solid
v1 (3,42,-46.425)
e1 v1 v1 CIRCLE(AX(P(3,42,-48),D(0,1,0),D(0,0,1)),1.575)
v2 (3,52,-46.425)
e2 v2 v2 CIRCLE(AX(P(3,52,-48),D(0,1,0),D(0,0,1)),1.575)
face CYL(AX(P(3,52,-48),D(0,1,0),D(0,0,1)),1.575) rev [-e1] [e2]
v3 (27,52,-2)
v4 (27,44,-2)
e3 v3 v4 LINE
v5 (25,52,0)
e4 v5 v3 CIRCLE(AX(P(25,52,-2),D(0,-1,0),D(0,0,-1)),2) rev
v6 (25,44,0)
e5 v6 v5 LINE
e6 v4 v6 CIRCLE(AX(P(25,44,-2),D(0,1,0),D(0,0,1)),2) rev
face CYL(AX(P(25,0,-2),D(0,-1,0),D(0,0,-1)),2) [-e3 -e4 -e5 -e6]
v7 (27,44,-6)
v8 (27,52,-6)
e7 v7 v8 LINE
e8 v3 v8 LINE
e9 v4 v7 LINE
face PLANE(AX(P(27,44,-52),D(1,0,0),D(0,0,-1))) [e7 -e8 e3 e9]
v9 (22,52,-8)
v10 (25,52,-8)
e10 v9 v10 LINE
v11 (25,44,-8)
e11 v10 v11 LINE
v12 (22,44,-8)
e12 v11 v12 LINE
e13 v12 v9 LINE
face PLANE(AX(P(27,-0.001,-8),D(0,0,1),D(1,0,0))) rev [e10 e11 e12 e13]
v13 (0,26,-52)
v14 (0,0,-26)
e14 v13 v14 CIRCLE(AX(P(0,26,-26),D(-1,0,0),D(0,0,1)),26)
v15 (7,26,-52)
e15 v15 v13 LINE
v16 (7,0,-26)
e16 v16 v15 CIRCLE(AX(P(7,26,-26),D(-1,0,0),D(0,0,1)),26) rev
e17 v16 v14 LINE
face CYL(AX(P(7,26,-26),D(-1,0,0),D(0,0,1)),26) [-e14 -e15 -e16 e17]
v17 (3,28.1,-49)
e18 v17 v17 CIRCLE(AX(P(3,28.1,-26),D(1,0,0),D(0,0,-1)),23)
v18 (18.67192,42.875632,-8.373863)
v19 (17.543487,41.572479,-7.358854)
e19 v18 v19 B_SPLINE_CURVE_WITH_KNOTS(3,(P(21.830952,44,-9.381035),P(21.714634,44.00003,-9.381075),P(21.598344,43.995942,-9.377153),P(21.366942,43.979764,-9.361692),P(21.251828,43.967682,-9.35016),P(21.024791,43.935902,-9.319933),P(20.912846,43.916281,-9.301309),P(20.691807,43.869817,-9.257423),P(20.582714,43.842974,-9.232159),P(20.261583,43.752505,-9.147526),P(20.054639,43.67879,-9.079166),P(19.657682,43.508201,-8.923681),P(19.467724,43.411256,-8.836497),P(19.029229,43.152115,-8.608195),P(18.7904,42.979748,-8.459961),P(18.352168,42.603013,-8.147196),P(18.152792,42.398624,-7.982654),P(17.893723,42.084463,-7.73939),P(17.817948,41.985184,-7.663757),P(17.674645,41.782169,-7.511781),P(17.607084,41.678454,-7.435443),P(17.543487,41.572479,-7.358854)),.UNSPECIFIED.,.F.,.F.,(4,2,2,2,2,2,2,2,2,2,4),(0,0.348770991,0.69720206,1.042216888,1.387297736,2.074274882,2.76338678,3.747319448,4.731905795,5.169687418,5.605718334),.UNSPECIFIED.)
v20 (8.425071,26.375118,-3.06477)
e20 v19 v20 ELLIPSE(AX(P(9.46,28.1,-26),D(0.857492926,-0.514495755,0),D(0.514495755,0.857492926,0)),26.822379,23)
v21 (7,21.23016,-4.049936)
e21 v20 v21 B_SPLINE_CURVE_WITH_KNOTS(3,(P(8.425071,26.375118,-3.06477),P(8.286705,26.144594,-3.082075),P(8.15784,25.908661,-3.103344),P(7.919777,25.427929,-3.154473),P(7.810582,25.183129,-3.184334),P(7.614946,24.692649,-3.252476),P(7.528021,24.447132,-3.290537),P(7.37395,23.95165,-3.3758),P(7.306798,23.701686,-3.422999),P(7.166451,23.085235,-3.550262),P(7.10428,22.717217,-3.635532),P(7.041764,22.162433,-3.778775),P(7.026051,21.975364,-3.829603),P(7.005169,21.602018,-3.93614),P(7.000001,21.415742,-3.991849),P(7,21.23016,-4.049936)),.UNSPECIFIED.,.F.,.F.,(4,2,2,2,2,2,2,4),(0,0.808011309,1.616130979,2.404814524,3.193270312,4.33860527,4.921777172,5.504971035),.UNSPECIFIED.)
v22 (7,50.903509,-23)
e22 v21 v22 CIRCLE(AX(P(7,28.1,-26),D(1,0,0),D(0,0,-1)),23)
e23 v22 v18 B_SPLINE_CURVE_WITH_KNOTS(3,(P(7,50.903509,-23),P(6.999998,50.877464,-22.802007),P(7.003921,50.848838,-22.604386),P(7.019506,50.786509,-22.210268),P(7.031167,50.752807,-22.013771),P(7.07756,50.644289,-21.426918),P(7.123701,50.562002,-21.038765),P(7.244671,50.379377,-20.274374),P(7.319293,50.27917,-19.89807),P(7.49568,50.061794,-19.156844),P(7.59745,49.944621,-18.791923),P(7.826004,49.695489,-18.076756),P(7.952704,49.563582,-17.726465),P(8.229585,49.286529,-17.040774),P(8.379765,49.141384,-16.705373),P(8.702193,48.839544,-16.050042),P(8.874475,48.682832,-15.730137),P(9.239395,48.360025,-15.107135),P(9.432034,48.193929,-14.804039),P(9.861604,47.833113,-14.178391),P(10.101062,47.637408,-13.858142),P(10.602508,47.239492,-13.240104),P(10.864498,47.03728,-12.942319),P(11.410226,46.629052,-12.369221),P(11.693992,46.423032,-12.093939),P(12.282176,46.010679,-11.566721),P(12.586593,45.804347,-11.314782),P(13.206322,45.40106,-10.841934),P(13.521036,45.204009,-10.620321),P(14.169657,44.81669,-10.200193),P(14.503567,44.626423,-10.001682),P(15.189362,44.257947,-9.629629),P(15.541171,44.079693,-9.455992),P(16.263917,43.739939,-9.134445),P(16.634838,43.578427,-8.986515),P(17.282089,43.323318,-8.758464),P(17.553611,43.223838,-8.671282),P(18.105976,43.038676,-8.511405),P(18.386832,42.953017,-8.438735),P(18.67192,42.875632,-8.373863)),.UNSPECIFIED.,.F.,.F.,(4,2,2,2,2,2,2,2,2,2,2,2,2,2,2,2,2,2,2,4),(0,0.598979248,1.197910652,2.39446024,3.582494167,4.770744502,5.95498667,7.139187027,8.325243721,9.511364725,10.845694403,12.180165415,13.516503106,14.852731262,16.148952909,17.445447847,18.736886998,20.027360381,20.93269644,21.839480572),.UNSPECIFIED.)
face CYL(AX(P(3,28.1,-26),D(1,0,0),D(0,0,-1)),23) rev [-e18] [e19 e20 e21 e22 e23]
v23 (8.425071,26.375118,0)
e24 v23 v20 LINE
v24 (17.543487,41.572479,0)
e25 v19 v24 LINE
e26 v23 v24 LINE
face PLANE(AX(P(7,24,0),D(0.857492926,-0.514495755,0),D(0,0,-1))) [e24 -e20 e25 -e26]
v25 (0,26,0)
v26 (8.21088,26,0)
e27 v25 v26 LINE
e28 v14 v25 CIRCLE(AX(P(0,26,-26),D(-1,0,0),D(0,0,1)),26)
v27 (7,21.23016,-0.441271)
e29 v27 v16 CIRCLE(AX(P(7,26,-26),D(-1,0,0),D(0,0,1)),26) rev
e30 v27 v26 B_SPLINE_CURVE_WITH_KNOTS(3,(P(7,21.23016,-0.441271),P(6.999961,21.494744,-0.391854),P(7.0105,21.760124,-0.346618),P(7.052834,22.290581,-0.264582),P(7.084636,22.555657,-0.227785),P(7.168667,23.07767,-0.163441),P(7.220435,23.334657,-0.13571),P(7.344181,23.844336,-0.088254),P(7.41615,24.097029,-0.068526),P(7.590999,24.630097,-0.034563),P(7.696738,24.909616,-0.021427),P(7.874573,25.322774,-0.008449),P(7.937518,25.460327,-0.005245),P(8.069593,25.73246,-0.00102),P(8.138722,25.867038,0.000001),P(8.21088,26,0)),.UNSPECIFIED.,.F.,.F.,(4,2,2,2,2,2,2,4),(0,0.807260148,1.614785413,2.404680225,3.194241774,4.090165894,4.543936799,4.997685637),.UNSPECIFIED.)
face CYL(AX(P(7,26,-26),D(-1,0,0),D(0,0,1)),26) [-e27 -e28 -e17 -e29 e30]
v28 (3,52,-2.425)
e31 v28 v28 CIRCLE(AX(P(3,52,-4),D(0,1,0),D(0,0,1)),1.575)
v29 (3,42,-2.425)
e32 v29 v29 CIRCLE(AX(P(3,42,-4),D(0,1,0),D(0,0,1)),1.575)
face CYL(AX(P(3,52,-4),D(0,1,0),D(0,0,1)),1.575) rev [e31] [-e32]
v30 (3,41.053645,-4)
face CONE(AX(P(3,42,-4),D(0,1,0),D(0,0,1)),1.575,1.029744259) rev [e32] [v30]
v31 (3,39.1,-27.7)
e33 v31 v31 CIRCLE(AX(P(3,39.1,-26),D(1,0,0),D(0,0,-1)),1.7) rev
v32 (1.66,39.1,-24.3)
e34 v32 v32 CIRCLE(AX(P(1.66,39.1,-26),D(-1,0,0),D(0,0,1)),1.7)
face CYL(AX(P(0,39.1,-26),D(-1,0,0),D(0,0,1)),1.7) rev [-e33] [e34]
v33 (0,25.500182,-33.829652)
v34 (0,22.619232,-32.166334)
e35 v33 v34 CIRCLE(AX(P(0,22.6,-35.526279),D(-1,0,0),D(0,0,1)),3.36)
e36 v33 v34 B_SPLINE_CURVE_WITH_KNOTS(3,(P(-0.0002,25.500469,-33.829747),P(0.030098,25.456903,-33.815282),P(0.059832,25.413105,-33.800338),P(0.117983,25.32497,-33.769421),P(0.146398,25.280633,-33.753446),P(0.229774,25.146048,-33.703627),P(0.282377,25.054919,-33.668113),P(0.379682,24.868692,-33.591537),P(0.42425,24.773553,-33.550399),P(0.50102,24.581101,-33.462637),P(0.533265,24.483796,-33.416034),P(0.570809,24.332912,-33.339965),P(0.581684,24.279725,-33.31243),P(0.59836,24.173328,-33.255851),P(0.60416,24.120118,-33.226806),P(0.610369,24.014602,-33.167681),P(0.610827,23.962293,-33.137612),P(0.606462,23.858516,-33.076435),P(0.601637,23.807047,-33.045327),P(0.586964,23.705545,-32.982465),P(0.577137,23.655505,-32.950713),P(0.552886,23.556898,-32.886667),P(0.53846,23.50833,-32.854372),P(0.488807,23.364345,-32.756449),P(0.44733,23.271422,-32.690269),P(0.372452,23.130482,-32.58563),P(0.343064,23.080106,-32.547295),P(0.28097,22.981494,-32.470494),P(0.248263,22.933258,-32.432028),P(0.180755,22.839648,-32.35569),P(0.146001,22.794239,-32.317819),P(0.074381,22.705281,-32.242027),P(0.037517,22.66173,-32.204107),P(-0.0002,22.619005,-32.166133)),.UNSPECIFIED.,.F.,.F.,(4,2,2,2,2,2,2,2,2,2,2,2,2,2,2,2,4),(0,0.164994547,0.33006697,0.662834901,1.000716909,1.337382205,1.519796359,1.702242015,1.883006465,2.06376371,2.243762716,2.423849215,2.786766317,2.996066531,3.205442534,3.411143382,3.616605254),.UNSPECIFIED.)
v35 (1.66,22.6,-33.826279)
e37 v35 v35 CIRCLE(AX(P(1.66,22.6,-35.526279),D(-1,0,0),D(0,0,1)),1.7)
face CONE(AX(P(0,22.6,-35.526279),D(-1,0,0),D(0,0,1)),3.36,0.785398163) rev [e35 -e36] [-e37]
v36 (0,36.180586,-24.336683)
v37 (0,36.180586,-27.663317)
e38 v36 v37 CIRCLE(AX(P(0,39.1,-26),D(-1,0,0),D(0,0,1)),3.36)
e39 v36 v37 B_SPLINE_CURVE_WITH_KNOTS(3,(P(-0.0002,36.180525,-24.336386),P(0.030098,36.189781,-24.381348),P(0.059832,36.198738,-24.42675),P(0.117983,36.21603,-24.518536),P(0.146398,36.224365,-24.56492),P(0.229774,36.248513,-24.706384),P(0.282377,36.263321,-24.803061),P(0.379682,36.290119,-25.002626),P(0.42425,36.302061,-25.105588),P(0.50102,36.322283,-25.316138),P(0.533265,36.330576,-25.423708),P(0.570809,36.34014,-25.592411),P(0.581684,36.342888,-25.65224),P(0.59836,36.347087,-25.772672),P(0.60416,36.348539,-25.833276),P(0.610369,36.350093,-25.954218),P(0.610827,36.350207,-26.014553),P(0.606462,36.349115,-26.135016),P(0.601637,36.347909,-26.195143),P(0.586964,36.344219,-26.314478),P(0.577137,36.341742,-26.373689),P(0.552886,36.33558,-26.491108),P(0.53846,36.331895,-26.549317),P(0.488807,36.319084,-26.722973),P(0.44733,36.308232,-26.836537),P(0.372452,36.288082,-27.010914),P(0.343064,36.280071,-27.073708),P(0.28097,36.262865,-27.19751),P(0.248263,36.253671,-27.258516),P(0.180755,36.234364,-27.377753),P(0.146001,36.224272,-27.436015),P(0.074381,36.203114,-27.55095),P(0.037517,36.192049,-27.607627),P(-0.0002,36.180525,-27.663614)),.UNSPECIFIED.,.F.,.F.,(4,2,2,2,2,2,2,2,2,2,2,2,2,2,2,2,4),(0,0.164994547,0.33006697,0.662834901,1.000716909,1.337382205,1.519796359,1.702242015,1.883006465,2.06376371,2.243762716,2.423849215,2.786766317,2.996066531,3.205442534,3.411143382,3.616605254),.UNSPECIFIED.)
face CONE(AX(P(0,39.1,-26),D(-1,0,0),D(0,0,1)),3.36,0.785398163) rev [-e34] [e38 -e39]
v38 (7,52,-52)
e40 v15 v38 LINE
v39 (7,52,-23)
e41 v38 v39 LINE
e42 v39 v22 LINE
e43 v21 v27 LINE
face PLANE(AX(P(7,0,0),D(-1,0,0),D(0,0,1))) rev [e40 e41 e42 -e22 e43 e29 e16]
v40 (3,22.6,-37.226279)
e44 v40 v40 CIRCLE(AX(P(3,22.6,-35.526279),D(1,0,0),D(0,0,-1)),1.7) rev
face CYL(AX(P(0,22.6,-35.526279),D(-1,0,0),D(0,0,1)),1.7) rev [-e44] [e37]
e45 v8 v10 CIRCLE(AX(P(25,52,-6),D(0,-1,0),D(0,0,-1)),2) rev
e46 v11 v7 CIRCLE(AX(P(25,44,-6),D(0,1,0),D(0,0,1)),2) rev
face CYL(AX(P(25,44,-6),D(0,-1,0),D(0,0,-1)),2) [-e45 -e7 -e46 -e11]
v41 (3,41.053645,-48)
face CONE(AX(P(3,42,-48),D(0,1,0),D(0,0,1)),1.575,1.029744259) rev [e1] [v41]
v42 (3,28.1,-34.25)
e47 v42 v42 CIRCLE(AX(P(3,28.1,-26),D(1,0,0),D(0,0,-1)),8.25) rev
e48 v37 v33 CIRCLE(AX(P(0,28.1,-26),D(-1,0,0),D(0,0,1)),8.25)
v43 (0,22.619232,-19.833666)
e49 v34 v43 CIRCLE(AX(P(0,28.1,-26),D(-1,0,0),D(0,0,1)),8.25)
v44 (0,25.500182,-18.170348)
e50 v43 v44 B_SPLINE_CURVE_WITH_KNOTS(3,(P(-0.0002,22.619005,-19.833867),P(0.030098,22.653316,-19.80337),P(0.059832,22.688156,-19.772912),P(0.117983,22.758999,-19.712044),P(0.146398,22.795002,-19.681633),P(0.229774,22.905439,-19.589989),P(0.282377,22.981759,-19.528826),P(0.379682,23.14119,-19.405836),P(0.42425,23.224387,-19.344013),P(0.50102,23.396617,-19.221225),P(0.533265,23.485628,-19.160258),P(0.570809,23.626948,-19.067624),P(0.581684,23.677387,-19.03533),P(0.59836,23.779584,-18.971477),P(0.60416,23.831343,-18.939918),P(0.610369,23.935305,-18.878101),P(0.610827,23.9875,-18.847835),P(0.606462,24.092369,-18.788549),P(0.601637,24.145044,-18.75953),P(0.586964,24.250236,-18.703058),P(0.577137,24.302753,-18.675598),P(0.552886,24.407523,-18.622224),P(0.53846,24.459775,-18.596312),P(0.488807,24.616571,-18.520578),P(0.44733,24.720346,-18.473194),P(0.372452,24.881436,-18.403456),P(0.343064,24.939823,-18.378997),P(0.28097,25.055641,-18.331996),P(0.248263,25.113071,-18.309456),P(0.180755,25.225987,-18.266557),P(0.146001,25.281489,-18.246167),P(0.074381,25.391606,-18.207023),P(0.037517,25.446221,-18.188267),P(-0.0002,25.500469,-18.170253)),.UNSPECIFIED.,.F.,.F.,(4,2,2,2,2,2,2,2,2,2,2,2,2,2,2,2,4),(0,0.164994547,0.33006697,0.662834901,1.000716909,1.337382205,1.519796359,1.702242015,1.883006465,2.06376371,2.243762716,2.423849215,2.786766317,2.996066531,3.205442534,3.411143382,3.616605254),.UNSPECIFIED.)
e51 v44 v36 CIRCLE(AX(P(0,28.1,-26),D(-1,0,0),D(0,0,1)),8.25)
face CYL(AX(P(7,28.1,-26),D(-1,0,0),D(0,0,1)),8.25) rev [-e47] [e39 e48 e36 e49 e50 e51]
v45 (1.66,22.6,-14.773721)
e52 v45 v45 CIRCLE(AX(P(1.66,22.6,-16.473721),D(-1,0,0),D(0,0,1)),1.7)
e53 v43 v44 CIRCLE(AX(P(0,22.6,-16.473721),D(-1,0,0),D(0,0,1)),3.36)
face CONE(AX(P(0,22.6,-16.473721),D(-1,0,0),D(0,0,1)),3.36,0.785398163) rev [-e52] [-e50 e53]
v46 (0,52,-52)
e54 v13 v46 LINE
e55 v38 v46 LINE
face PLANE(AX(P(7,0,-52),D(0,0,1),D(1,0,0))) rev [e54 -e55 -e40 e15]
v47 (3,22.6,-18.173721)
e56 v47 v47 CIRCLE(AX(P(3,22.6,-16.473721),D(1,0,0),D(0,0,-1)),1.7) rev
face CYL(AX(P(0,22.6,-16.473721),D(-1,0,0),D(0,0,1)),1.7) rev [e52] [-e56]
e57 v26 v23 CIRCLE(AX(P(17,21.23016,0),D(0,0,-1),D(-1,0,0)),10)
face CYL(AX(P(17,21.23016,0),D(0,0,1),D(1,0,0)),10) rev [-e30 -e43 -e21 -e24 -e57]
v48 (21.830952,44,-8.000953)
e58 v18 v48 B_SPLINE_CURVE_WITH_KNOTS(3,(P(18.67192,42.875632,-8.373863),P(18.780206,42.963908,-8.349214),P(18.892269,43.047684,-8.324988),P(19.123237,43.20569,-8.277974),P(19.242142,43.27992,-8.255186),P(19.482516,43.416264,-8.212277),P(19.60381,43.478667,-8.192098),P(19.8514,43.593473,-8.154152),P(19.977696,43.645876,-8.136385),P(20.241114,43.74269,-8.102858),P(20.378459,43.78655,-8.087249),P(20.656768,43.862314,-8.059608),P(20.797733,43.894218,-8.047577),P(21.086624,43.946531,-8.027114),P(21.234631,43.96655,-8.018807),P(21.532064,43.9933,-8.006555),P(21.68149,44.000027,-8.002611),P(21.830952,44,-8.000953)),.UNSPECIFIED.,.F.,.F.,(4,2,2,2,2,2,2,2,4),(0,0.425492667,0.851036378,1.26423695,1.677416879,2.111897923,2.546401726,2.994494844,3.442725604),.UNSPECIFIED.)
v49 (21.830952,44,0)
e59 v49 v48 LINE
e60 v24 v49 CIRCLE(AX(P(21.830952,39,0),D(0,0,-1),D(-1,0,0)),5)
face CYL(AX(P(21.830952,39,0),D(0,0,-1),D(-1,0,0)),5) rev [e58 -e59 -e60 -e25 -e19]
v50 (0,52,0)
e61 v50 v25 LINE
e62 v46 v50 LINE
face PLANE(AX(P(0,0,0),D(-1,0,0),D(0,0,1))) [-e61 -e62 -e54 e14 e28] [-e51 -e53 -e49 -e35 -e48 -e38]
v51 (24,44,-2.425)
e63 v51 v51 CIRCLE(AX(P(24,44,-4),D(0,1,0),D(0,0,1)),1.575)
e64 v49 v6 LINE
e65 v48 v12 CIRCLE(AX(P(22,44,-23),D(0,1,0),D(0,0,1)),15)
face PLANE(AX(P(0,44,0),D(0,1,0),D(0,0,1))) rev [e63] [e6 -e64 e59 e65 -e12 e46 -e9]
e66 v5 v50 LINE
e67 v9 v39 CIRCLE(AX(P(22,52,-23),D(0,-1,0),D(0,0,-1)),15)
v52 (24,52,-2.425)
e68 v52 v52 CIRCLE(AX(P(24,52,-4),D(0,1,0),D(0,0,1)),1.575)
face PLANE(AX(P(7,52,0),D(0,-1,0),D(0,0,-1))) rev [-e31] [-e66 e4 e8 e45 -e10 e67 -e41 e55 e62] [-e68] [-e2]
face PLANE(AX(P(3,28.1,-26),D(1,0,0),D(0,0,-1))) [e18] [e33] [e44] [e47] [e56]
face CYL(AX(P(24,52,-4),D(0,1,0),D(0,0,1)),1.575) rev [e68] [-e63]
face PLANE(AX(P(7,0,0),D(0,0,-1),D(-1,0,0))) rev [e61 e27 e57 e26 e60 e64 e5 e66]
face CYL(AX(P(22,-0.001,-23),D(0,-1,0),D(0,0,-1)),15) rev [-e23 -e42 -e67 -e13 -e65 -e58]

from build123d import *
from OCP.BRepFilletAPI import BRepFilletAPI_MakeChamfer

# Parameters (mm, degrees)
ESBO_O1_W                                      = 52
ESBO_O1_H                                      = 52
RESSALTO_EXTRUS_O1_DEPTH                       = 7
ESBO_O2_R                                      = 8.25
CORTE_EXTRUS_O1_DEPTH                          = 74.87151007
ESCAREADO_PARA_SFHCS_M31_D                     = 3.4
ESCAREADO_PARA_SFHCS_M31_CSINK_D               = 6.72
ESCAREADO_PARA_SFHCS_M31_CSINK_ANGLE           = 90
PADR_OCIRCULAR1_COUNT                          = 3
ESBO_O27_R                                     = 23
CORTE_EXTRUS_O5_DEPTH                          = 4
FILETE1_R                                      = 26
FURO_ROSCADO_PARA_CONDU_TE_DE_M3X0_51_AT_COUNT = 2
FURO_ROSCADO_PARA_CONDU_TE_DE_M3X0_51_AT_PITCH = 44
ESBO_O35_W                                     = 20
ESBO_O35_H                                     = 52
RESSALTO_EXTRUS_O2_DEPTH                       = 8
ESBO_O37_R                                     = 23
CORTE_EXTRUS_O6_DEPTH                          = 77.210235533
CHANFRO1_SIZE                                  = 12
CHANFRO1_SIZE2                                 = 20
FILETE2_R                                      = 10
FILETE3_R                                      = 5
CORTE_EXTRUS_O7_REACH                          = 80.339
ESBO_O39_W                                     = 20
ESBO_O39_H                                     = 36
FILETE5_R                                      = 15
FILETE6_R                                      = 2
CORTE_EXTRUS_O9_REACH                          = 80.339
ESBO_O43_W                                     = 39.515082023
ESBO_O43_H                                     = 58.102579794


with BuildPart() as part:
    # Esboço1 → Ressalto-extrusão1 (new body)
    with BuildSketch(Plane(origin=(0, 0, 0), x_dir=(0, 0, -1), z_dir=(1, 0, 0))):
        with Locations((26, 26)):
            Rectangle(ESBO_O1_W, ESBO_O1_H)
    extrude(amount=RESSALTO_EXTRUS_O1_DEPTH)

    # Esboço2 → Corte-extrusão1 (cut, through all)
    with BuildSketch(Plane.ZY):
        with Locations((-26, 28.1)):
            Circle(ESBO_O2_R)
    extrude(amount=-CORTE_EXTRUS_O1_DEPTH, mode=Mode.SUBTRACT)

    # Escareado para SFHCS M31 (through all)
    with Locations(Plane.ZY):
        with Locations((-26, 39.1)):
            escareado_para_sfhcs_m31 = CounterSinkHole(ESCAREADO_PARA_SFHCS_M31_D / 2, ESCAREADO_PARA_SFHCS_M31_CSINK_D / 2, counter_sink_angle=ESCAREADO_PARA_SFHCS_M31_CSINK_ANGLE)

    # PadrãoCircular1: Escareado para SFHCS M31 ×3 about axis
    padr_ocircular1_axis = Axis((0, 28.1, -26), (1, 0, 0))
    for i in range(1, PADR_OCIRCULAR1_COUNT):
        add(escareado_para_sfhcs_m31.rotate(padr_ocircular1_axis, i * 360 / PADR_OCIRCULAR1_COUNT), mode=Mode.SUBTRACT)

    # Esboço27 → Corte-extrusão5 (cut)
    with BuildSketch(Plane(origin=(7, 0, 0), x_dir=(0, 0, -1), z_dir=(1, 0, 0))):
        with Locations((26, 28.1)):
            Circle(ESBO_O27_R)
    extrude(amount=-CORTE_EXTRUS_O5_DEPTH, mode=Mode.SUBTRACT)

    # Filete1
    filete1_edges = [part.edges().sort_by_distance(p)[0] for p in [
        (3.5, 0, -52),
        (3.5, 0, 0),
    ]]
    fillet(filete1_edges, radius=FILETE1_R - 0.0001)  # a hair under: the kernel refuses the full size

    # Esboço34 → Furo roscado para conduíte de M3x0.51 (revolve, cut)
    with BuildSketch(Plane(origin=(3, 52, -48), x_dir=(0, 0, 1), z_dir=(1, 0, 0))):
        Polygon((0, 0), (0, 10.946355475), (1.575, 10), (1.575, 0), align=None)
    furo_roscado_para_condu_te_de_m3x0_51 = revolve(axis=Axis((3, 58.35, -48), (0, -1, 0)), mode=Mode.SUBTRACT)

    # Furo roscado para conduíte de M3x0.51 at: Furo roscado para conduíte de M3x0.51 ×2
    with Locations(*[(0, 0, i * FURO_ROSCADO_PARA_CONDU_TE_DE_M3X0_51_AT_PITCH) for i in range(1, FURO_ROSCADO_PARA_CONDU_TE_DE_M3X0_51_AT_COUNT)]):
        add(furo_roscado_para_condu_te_de_m3x0_51, mode=Mode.SUBTRACT)

    # Esboço35 → Ressalto-extrusão2 (add)
    with BuildSketch(Plane(origin=(0, 52, 0), x_dir=(1, 0, 0), z_dir=(0, 1, 0))):
        with Locations((17, 26)):
            Rectangle(ESBO_O35_W, ESBO_O35_H)
    extrude(amount=-RESSALTO_EXTRUS_O2_DEPTH)

    # Esboço37 → Corte-extrusão6 (cut, through all)
    with BuildSketch(Plane(origin=(7, 0, 0), x_dir=(0, 0, -1), z_dir=(1, 0, 0))):
        with Locations((26, 28.1)):
            Circle(ESBO_O37_R)
    extrude(amount=CORTE_EXTRUS_O6_DEPTH, mode=Mode.SUBTRACT)

    # Chanfro1: one chamfer whose edges measure the first distance from different faces: ONE call of the kernel's chamfer builder (chamfer() names one face for all edges)
    chanfro1_edges_1 = [part.edges().sort_by_distance(p)[0] for p in [
        (7, 44, -47.309482535),
    ]]
    chanfro1_side_1 = [part.faces().sort_by_distance(p)[0] for p in [
        (17, 44, -47.309482535),
    ]]
    chanfro1_edges_2 = [part.edges().sort_by_distance(p)[0] for p in [
        (7, 44, -4.690517465),
    ]]
    chanfro1_side_2 = [part.faces().sort_by_distance(p)[0] for p in [
        (17, 44, -4.690517465),
    ]]
    chanfro1 = BRepFilletAPI_MakeChamfer(part.part.solid().wrapped)
    for e in chanfro1_edges_1:
        chanfro1.Add(CHANFRO1_SIZE, CHANFRO1_SIZE2, e.wrapped, chanfro1_side_1[0].wrapped)  # the first distance lies on this face
    for e in chanfro1_edges_2:
        chanfro1.Add(CHANFRO1_SIZE, CHANFRO1_SIZE2, e.wrapped, chanfro1_side_2[0].wrapped)  # the first distance lies on this face
    add(Compound.cast(chanfro1.Shape()), mode=Mode.REPLACE)

    # Filete2
    filete2_edges = [part.edges().sort_by_distance(p)[0] for p in [
        (7, 24, -1.722707367),
        (7, 24, -50.277292633),
    ]]
    fillet(filete2_edges, radius=FILETE2_R)

    # Filete3
    filete3_edges = [part.edges().sort_by_distance(p)[0] for p in [
        (19, 44, -4.690517465),
        (19, 44, -47.309482535),
    ]]
    fillet(filete3_edges, radius=FILETE3_R)

    # Espelhar1: Furo roscado para conduíte de M3x0.51 across plane
    add(furo_roscado_para_condu_te_de_m3x0_51.mirror(Plane.ZY.offset(-13.5)), mode=Mode.SUBTRACT)

    # Espelhar1 copy 1 sketch → Espelhar1 copy 1 (revolve, cut)
    with BuildSketch(Plane(origin=(24, 52, -4), x_dir=(0, 0, 1), z_dir=(-1, 0, 0))):
        Polygon((0, 0), (0, -10.946355475), (1.575, -10), (1.575, 0), align=None)
    revolve(axis=Axis((24, 58.35, -4), (0, 1, 0)), mode=Mode.SUBTRACT)

    # Esboço39 → Corte-extrusão7 (cut, up to next)
    with BuildSketch(Plane(origin=(0, 52, 0), x_dir=(1, 0, 0), z_dir=(0, 1, 0)), mode=Mode.PRIVATE) as corte_extrus_o7_sk1:
        with Locations((17, 26)):
            Rectangle(ESBO_O39_W, ESBO_O39_H)
    corte_extrus_o7_tool1 = extrude(corte_extrus_o7_sk1.sketch, amount=-CORTE_EXTRUS_O7_REACH, mode=Mode.PRIVATE) & part.part
    add(corte_extrus_o7_tool1.solids().sort_by_distance((17, 52, -26))[0], mode=Mode.SUBTRACT)

    # Filete5
    filete5_edges = [part.edges().sort_by_distance(p)[0] for p in [
        (7, 47.208910532, -44),
        (7, 47.208910532, -8),
    ]]
    fillet(filete5_edges, radius=FILETE5_R)

    # Filete6
    filete6_edges = [part.edges().sort_by_distance(p)[0] for p in [
        (27, 48, -44),
        (27, 48, -8),
        (27, 48, -52),
        (27, 48, 0),
    ]]
    fillet(filete6_edges, radius=FILETE6_R)

    # Esboço43 → Corte-extrusão9 (cut, up to next)
    with BuildSketch(Plane(origin=(0, 0, -52), x_dir=(-1, 0, 0), z_dir=(0, 0, -1)), mode=Mode.PRIVATE) as corte_extrus_o9_sk1:
        with Locations((-26.757541012, 29.051289897)):
            Rectangle(ESBO_O43_W, ESBO_O43_H)
    corte_extrus_o9_tool1 = extrude(corte_extrus_o9_sk1.sketch, amount=-CORTE_EXTRUS_O9_REACH, mode=Mode.PRIVATE) & part.part
    add(corte_extrus_o9_tool1.solids().sort_by_distance((26.757541, 29.05129, -52))[0], mode=Mode.SUBTRACT)


solid = part.part
